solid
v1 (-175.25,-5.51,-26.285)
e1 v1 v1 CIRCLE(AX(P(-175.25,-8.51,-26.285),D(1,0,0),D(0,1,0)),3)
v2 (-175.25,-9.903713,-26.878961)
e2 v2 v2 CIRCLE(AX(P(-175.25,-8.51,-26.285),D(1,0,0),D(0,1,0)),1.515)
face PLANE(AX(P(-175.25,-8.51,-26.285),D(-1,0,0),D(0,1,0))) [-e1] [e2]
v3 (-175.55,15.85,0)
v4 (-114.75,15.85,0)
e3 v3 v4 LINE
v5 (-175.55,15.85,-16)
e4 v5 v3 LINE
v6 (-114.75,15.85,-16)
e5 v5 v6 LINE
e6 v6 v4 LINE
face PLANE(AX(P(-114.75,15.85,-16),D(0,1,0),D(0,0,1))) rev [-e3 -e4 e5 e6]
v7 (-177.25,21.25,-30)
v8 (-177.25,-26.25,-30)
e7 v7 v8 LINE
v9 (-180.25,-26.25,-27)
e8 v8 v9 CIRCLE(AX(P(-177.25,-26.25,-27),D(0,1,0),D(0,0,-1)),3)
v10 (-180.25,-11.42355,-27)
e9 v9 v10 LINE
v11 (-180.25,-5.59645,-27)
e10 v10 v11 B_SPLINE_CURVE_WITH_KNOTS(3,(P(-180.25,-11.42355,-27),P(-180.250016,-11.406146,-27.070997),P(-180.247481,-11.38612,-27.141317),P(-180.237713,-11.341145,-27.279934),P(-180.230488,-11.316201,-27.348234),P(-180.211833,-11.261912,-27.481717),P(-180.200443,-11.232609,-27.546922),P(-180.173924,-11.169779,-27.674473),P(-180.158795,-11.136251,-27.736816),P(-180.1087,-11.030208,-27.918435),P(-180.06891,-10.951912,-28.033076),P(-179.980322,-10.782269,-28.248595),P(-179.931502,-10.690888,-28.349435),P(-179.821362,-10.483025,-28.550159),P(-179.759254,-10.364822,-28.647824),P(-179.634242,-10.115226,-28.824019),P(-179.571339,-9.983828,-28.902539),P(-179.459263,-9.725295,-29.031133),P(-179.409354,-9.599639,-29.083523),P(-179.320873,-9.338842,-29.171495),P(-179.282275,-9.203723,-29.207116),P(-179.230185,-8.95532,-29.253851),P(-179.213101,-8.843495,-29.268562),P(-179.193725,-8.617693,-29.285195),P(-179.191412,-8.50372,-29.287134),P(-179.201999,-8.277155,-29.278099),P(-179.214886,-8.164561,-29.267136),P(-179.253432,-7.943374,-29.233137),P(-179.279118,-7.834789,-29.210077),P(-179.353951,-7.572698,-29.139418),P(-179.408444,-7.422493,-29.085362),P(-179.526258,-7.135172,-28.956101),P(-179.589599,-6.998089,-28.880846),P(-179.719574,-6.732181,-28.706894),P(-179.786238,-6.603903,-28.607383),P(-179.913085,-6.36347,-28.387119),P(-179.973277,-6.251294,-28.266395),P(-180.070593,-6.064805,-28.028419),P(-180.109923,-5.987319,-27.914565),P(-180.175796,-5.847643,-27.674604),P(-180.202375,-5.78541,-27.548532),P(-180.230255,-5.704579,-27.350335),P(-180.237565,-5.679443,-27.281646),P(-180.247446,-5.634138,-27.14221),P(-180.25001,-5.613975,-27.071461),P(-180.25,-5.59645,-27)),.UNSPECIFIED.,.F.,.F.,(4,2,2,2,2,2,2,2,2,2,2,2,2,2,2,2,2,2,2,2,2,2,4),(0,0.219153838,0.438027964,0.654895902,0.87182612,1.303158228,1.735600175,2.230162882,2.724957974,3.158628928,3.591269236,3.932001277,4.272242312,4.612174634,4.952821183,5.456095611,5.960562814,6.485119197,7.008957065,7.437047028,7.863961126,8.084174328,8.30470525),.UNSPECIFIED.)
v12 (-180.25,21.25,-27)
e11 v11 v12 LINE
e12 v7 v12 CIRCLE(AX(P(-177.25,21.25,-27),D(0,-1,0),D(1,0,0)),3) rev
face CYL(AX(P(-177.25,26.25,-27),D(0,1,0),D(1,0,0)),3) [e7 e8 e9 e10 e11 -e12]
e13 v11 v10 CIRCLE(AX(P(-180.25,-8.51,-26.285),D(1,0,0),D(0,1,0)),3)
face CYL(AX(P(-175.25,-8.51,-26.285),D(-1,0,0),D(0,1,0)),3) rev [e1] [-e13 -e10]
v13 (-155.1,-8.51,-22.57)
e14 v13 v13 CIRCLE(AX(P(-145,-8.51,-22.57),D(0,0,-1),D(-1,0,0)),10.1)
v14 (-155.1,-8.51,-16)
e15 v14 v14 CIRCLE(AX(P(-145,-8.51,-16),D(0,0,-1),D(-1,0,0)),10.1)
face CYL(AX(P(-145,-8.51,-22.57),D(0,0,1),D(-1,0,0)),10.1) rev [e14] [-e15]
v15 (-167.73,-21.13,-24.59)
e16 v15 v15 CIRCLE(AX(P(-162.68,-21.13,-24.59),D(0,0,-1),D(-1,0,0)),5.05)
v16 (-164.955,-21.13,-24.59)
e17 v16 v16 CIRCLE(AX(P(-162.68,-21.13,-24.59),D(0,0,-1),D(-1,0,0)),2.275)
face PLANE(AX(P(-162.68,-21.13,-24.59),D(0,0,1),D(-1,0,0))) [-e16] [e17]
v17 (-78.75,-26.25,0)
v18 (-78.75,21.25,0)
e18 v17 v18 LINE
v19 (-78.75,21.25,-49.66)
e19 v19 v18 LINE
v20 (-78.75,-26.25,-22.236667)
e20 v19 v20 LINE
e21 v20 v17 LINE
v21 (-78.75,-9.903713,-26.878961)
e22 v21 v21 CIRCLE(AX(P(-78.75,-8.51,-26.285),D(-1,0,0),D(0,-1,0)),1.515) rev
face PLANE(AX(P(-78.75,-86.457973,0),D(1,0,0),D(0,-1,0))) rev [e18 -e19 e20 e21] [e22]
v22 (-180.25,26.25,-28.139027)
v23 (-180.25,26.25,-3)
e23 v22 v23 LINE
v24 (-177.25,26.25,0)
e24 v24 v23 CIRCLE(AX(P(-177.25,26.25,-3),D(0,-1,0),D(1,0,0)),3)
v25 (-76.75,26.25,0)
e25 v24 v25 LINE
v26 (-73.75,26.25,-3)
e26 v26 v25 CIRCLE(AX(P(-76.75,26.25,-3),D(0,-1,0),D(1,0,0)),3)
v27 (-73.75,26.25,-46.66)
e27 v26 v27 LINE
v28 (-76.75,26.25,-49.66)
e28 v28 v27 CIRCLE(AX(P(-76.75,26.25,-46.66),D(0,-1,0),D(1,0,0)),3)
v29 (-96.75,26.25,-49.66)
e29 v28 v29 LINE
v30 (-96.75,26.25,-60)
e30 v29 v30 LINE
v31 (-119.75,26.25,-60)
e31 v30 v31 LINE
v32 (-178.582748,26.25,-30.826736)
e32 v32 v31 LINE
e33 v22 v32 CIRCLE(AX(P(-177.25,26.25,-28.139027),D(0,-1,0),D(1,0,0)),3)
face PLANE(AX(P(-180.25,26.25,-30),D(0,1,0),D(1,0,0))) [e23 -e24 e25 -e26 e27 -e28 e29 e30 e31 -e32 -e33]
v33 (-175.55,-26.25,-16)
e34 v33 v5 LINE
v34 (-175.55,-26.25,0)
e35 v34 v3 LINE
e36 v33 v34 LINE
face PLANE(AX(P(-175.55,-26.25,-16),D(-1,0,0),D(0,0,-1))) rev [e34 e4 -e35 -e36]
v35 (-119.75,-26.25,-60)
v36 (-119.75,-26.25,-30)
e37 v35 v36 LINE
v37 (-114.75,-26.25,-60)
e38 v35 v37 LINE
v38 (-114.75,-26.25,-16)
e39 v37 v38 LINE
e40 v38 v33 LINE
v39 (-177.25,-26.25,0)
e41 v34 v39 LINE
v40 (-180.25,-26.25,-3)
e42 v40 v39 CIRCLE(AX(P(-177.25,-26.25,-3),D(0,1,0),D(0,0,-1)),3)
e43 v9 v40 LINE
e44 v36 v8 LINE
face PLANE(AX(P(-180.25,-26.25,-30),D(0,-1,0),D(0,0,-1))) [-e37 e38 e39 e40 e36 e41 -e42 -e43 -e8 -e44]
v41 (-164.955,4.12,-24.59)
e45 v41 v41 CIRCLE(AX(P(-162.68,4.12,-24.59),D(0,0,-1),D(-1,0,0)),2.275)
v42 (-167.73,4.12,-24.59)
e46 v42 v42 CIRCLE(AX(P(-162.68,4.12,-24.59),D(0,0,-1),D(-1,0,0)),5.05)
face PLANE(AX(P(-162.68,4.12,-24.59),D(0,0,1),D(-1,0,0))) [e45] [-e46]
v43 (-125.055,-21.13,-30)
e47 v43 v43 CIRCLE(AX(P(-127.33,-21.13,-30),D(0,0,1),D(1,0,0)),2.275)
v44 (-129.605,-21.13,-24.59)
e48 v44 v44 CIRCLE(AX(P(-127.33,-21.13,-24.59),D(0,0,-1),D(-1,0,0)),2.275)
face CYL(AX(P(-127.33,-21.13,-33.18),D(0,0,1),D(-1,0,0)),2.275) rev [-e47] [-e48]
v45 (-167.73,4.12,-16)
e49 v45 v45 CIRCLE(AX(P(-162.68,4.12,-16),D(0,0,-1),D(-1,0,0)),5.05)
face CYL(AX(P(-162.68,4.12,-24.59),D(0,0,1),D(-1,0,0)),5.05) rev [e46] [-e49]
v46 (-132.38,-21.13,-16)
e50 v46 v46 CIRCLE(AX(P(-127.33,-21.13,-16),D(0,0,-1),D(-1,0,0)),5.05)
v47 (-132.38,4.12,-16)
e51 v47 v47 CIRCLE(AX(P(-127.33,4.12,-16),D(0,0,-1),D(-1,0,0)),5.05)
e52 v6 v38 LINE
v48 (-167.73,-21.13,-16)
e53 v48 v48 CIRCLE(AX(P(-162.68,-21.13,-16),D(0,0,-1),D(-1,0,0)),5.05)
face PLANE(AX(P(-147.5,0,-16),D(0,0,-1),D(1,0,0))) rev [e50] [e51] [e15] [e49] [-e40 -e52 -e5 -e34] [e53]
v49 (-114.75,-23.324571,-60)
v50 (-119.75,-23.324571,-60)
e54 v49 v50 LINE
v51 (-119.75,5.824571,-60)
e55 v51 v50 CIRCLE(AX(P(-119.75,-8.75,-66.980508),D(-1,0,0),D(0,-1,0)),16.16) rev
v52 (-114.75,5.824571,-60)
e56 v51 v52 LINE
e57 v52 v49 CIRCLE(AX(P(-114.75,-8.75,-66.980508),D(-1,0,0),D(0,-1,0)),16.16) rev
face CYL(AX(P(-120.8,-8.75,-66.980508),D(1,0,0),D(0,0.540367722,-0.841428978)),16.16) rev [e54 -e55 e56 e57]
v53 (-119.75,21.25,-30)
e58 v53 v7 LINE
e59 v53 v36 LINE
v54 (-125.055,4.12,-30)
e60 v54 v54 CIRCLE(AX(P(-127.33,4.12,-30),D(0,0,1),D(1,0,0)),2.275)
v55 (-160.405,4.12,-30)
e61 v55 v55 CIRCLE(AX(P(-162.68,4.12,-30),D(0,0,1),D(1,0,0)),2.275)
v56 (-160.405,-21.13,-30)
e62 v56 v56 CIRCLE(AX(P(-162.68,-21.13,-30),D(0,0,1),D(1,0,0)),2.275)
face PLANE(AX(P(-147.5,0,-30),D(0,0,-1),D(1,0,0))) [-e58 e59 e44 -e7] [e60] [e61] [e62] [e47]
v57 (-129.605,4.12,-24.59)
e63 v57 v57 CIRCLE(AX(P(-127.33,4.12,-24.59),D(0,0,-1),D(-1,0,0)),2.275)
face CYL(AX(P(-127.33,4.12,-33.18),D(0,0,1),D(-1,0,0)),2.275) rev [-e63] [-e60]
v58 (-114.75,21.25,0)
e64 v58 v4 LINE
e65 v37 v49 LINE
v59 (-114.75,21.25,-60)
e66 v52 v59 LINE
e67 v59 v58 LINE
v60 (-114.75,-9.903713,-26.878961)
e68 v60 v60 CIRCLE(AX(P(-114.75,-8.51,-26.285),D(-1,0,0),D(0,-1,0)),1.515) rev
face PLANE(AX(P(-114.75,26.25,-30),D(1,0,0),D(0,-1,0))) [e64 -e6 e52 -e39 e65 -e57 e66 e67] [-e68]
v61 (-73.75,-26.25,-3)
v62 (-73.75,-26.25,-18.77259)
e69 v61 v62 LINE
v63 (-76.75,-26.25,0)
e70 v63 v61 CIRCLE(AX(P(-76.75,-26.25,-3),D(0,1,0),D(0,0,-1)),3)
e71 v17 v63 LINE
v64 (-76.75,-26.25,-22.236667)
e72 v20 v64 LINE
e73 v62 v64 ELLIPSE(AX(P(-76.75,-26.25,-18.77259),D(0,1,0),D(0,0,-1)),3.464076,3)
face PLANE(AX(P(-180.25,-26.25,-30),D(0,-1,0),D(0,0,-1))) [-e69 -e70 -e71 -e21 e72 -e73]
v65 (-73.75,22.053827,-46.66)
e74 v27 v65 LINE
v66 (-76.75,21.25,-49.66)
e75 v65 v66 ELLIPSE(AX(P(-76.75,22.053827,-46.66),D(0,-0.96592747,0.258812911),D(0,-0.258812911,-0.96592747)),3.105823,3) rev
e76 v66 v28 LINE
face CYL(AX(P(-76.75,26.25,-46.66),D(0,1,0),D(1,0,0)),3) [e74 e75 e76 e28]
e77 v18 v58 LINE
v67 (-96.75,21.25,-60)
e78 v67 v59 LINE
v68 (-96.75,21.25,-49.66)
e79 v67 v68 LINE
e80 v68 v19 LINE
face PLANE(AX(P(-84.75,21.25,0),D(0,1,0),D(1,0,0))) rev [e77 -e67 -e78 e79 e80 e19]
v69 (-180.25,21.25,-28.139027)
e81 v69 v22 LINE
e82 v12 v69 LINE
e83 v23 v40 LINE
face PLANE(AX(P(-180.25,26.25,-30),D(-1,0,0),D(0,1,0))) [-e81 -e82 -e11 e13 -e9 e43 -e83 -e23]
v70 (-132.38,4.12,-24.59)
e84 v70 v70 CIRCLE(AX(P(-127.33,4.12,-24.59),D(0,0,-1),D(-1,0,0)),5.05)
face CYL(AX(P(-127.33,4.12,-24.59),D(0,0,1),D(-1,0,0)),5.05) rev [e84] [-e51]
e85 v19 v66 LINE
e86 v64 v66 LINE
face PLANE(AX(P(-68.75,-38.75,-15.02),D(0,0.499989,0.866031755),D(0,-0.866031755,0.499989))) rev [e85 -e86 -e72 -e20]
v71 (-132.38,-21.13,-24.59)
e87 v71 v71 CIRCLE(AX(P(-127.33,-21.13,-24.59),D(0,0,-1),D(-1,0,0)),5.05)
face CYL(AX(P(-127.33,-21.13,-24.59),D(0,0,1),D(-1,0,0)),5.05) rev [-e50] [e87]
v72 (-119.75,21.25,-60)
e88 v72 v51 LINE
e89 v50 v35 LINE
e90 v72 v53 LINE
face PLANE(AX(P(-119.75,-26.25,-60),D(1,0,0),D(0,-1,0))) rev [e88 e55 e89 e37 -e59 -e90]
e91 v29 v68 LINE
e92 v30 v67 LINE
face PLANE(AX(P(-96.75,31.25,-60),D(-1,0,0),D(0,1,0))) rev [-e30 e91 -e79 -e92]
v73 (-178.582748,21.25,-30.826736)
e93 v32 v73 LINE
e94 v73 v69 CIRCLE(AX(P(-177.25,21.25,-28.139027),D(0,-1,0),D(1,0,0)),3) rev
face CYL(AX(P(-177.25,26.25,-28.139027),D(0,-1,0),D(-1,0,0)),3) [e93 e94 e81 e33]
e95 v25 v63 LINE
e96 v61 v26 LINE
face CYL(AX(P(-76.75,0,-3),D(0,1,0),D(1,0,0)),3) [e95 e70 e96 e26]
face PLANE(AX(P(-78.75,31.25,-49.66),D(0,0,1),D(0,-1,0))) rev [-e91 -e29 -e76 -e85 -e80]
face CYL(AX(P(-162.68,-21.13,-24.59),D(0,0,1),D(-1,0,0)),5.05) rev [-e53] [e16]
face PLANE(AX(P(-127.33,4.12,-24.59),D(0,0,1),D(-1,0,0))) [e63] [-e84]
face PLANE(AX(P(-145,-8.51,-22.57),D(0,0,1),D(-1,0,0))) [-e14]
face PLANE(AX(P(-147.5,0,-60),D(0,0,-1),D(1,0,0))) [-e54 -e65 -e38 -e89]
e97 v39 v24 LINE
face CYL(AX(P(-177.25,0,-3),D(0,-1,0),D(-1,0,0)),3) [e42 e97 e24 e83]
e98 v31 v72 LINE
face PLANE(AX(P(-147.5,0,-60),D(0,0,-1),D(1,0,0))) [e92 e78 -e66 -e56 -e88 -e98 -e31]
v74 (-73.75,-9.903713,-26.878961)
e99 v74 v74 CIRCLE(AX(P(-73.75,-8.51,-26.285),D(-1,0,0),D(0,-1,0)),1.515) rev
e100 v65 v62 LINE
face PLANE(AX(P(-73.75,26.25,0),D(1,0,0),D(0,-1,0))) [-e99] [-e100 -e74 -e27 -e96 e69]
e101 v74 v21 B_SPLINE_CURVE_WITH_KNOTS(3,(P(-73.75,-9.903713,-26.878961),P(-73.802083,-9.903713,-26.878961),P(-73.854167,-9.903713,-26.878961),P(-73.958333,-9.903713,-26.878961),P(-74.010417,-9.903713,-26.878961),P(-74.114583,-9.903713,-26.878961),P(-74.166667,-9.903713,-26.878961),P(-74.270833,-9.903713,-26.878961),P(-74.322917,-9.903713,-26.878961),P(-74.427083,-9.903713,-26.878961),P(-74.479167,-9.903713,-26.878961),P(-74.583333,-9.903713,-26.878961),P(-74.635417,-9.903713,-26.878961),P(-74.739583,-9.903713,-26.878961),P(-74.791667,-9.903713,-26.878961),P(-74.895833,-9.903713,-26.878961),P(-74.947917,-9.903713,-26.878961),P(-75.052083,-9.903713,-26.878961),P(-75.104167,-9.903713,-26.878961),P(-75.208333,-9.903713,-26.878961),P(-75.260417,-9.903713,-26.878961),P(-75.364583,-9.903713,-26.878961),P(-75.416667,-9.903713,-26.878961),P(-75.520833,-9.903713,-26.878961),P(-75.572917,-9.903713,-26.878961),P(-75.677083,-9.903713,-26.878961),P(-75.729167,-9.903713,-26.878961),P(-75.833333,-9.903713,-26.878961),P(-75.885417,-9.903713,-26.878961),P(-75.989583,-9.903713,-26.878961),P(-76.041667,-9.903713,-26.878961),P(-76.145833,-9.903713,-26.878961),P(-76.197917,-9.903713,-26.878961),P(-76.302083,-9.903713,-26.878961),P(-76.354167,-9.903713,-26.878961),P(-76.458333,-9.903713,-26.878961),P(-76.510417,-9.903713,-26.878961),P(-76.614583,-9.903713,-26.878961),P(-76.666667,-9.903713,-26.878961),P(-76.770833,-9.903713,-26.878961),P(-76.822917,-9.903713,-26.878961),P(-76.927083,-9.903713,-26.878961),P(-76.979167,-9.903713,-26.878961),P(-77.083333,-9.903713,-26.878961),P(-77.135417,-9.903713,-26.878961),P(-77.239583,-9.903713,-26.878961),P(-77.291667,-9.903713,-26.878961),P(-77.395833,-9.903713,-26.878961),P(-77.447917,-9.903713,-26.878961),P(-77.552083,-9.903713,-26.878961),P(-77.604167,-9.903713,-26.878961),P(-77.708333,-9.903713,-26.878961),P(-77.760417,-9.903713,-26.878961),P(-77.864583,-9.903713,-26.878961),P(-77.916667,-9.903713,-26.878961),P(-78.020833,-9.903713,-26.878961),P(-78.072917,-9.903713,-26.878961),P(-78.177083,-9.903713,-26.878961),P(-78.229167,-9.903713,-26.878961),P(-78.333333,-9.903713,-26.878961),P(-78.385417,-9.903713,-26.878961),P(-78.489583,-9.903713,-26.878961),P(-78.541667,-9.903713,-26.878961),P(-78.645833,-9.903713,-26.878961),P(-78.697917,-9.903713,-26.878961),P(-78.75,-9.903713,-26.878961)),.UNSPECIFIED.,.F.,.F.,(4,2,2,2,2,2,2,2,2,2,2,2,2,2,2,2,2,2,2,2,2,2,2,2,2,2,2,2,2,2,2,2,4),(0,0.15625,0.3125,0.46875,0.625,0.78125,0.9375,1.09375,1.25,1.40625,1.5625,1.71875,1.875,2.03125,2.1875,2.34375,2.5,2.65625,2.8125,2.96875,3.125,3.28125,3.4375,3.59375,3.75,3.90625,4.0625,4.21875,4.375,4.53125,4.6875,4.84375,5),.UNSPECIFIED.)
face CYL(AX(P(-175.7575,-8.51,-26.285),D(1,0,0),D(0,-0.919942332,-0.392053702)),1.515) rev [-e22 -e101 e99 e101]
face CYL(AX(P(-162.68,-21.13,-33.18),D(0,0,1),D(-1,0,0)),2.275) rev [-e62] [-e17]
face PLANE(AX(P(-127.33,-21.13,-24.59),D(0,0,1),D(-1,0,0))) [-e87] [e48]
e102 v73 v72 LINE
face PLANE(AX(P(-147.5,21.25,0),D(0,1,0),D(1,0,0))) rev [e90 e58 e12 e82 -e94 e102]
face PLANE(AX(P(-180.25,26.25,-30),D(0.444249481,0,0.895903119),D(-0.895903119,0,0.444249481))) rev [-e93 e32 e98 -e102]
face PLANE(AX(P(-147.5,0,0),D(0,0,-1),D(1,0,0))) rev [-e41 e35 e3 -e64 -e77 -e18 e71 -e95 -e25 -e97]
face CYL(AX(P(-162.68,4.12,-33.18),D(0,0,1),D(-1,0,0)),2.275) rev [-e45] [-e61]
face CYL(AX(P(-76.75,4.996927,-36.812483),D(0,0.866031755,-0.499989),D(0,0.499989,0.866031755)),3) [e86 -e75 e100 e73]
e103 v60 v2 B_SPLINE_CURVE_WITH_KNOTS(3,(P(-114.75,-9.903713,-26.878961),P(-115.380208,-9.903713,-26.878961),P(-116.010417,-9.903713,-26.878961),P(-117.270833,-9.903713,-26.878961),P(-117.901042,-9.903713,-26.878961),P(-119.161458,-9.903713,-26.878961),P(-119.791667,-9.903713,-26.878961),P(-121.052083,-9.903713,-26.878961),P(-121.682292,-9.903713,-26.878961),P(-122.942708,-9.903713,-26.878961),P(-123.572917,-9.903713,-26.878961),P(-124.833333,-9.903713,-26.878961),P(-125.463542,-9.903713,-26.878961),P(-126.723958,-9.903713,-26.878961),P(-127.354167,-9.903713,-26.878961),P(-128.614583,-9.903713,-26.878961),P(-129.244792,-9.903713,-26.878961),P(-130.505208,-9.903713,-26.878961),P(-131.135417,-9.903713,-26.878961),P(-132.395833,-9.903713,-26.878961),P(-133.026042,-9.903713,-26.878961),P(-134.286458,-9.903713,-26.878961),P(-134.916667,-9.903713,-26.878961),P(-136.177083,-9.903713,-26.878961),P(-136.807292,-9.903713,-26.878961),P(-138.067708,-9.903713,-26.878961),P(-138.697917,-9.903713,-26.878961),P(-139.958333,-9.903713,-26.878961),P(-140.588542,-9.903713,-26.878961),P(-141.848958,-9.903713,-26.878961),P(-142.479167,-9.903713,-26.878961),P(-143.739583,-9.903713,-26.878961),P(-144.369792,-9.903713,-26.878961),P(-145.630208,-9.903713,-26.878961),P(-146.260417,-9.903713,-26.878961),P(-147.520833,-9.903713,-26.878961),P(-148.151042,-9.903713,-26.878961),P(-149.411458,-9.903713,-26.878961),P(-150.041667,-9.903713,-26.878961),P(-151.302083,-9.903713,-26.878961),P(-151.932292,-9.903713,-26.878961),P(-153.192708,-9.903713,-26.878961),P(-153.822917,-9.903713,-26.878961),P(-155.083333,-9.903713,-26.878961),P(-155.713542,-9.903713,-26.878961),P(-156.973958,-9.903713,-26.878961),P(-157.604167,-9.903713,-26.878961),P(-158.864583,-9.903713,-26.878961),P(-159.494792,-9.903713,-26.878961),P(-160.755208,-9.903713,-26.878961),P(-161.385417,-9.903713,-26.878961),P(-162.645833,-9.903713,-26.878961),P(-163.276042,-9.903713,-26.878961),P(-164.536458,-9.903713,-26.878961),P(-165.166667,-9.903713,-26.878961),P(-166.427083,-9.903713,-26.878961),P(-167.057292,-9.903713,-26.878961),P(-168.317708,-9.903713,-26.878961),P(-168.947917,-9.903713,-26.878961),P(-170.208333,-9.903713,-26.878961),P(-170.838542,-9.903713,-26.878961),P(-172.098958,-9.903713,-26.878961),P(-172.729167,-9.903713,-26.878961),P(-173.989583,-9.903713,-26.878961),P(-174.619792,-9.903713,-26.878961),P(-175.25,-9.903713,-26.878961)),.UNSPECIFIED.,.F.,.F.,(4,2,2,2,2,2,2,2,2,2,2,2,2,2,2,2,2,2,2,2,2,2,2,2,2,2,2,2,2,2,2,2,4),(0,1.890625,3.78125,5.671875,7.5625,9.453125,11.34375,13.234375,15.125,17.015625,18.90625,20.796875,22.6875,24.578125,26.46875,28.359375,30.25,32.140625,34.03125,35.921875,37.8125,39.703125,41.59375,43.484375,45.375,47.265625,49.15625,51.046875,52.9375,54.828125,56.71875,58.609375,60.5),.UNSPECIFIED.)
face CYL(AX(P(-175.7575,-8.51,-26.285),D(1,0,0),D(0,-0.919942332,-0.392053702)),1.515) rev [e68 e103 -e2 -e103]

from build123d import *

# Parameters (mm, degrees)
CROQUIS1_W              = 65.5
CROQUIS1_H              = 52.5
SALIENTE_EXTRUIR1_DEPTH = 30
CROQUIS2_W              = 60.8
CROQUIS2_H              = 42.1
CORTAR_EXTRUIR1_DEPTH   = 16
CROQUIS3_W              = 5
CROQUIS3_H              = 52.5
SALIENTE_EXTRUIR2_DEPTH = 30
CROQUIS4_W              = 60
CROQUIS4_H              = 5
SALIENTE_EXTRUIR3_DEPTH = 30
CROQUIS5_R              = 10.1
CORTAR_EXTRUIR2_DEPTH   = 6.57
CROQUIS7_R              = 5.05
CORTAR_EXTRUIR3_DEPTH   = 8.59
CROQUIS8_R              = 2.275
CORTAR_EXTRUIR4_DEPTH   = 8.59
CROQUIS9_W              = 60.5
CROQUIS9_H              = 30
SALIENTE_EXTRUIR4_DEPTH = 5
CORTAR_EXTRUIR5_DEPTH   = 5
CROQUIS11_W             = 41
CROQUIS11_H             = 60
SALIENTE_EXTRUIR5_DEPTH = 5
CROQUIS12_W             = 5
CROQUIS12_H             = 60
SALIENTE_EXTRUIR6_DEPTH = 47.5
CROQUIS13_W             = 18
CROQUIS13_H             = 10.34
CORTAR_EXTRUIR6_DEPTH   = 10
CROQUIS14_W             = 17.194416488
CROQUIS14_H             = 64.089157204
CORTAR_EXTRUIR7_DEPTH   = 10
CORTAR_EXTRUIR8_DEPTH   = 10
REDONDEO1_R             = 3
REDONDEO6_R             = 3
REDONDEO7_R             = 3
CAVIDAD1_START          = -32.75
CAVIDAD1_DEPTH          = 5
CROQUIS16_R             = 1.5
CORTAR_EXTRUIR10_DEPTH  = 10
CAVIDAD3_START          = -73.75
CAVIDAD3_OUTLINE_R      = 1.515
CAVIDAD3_DEPTH          = 106.5
CROQUIS17_R             = 3
CORTAR_EXTRUIR11_DEPTH  = 5
REDONDEO8_R             = 3
REDONDEO9_R             = 3


# Read off the part's stored shape, not the designer's step: Cavidad1, Cavidad3
with BuildPart() as part:
    # Croquis1 → Saliente-Extruir1 (new body)
    with BuildSketch(Plane.XY):
        Rectangle(CROQUIS1_W, CROQUIS1_H)
    extrude(amount=-SALIENTE_EXTRUIR1_DEPTH)

    # Croquis2 → Cortar-Extruir1 (cut)
    with BuildSketch(Plane.XY):
        with Locations((-2.35, -5.2)):
            Rectangle(CROQUIS2_W, CROQUIS2_H)
    extrude(amount=-CORTAR_EXTRUIR1_DEPTH, mode=Mode.SUBTRACT)

    # Croquis3 → Saliente-Extruir2 (add)
    with BuildSketch(Plane(origin=(0, 0, -30), x_dir=(-1, 0, 0), z_dir=(0, 0, -1))):
        with Locations((30.25, 0)):
            Rectangle(CROQUIS3_W, CROQUIS3_H)
    extrude(amount=SALIENTE_EXTRUIR2_DEPTH)

    # Croquis4 → Saliente-Extruir3 (add)
    with BuildSketch(Plane.ZY.offset(32.75)):
        with Locations((-30, 23.75)):
            Rectangle(CROQUIS4_W, CROQUIS4_H)
    extrude(amount=SALIENTE_EXTRUIR3_DEPTH)

    # Croquis5 → Cortar-Extruir2 (cut)
    with BuildSketch(Plane.XY.offset(-16)):
        with Locations((-2.5, -8.51)):
            Circle(CROQUIS5_R)
    extrude(amount=-CORTAR_EXTRUIR2_DEPTH, mode=Mode.SUBTRACT)

    # Croquis7 → Cortar-Extruir3 (cut)
    with BuildSketch(Plane.XY.offset(-16)):
        with Locations((-20.17, 4.12)):
            Circle(CROQUIS7_R)
        with Locations((15.18, 4.12)):
            Circle(CROQUIS7_R)
        with Locations((15.18, -21.13)):
            Circle(CROQUIS7_R)
        with Locations((-20.17, -21.13)):
            Circle(CROQUIS7_R)
    extrude(amount=-CORTAR_EXTRUIR3_DEPTH, mode=Mode.SUBTRACT)

    # Croquis8 → Cortar-Extruir4 (cut)
    with BuildSketch(Plane.XY.offset(-24.59)):
        with Locations((-20.17, 4.12)):
            Circle(CROQUIS8_R)
        with Locations((-20.17, -21.13)):
            Circle(CROQUIS8_R)
        with Locations((15.18, 4.12)):
            Circle(CROQUIS8_R)
        with Locations((15.18, -21.13)):
            Circle(CROQUIS8_R)
    extrude(amount=-CORTAR_EXTRUIR4_DEPTH, mode=Mode.SUBTRACT)

    # Croquis9 → Saliente-Extruir4 (add)
    with BuildSketch(Plane(origin=(0, 26.25, 0), x_dir=(1, 0, 0), z_dir=(0, 1, 0))):
        with Locations((2.5, 45)):
            Rectangle(CROQUIS9_W, CROQUIS9_H)
    extrude(amount=-SALIENTE_EXTRUIR4_DEPTH)

    # Croquis10 → Cortar-Extruir5 (cut)
    with BuildSketch(Plane.XZ.offset(-21.25)):
        Polygon((32.75, -30), (-27.75, -60), (-30.096630242, -66.962952029), (62.11742193, -82.705107475), (54.436655983, -30), align=None)
    extrude(amount=-CORTAR_EXTRUIR5_DEPTH, mode=Mode.SUBTRACT)

    # Croquis11 → Saliente-Extruir5 (add)
    with BuildSketch(Plane.XZ.offset(-21.25)):
        with Locations((-53.25, -30)):
            Rectangle(CROQUIS11_W, CROQUIS11_H)
    extrude(amount=-SALIENTE_EXTRUIR5_DEPTH)

    # Croquis12 → Saliente-Extruir6 (add)
    with BuildSketch(Plane.XZ.offset(-21.25)):
        with Locations((-71.25, -30)):
            Rectangle(CROQUIS12_W, CROQUIS12_H)
    extrude(amount=SALIENTE_EXTRUIR6_DEPTH)

    # Croquis13 → Cortar-Extruir6 (cut)
    with BuildSketch(Plane.XZ.offset(-21.25)):
        with Locations((-59.75, -54.83)):
            Rectangle(CROQUIS13_W, CROQUIS13_H)
    extrude(amount=-CORTAR_EXTRUIR6_DEPTH, mode=Mode.SUBTRACT)

    # Croquis14 → Cortar-Extruir7 (cut)
    with BuildSketch(Plane(origin=(-68.75, 0, 0), x_dir=(0, 0, -1), z_dir=(1, 0, 0))):
        with Locations((58.257208244, -5.794578602)):
            Rectangle(CROQUIS14_W, CROQUIS14_H)
    extrude(amount=-CORTAR_EXTRUIR7_DEPTH, mode=Mode.SUBTRACT)

    # Croquis15 → Cortar-Extruir8 (cut)
    with BuildSketch(Plane(origin=(-68.75, 0, 0), x_dir=(0, 0, -1), z_dir=(1, 0, 0))):
        Polygon((15.02, -38.75), (49.66, 21.25), (49.66, -38.75), align=None)
    extrude(amount=-CORTAR_EXTRUIR8_DEPTH, mode=Mode.SUBTRACT)

    # Redondeo1
    redondeo1_edges = [part.edges().sort_by_distance(p)[0] for p in [
        (32.75, 0, 0),
    ]]
    fillet(redondeo1_edges, radius=REDONDEO1_R)

    # Redondeo6
    redondeo6_edges = [part.edges().sort_by_distance(p)[0] for p in [
        (32.75, -2.5, -30),
    ]]
    fillet(redondeo6_edges, radius=REDONDEO6_R)

    # Redondeo7
    redondeo7_edges = [part.edges().sort_by_distance(p)[0] for p in [
        (32.75, 23.75, -30),
    ]]
    fillet(redondeo7_edges, radius=REDONDEO7_R)

    # Cavidad1 outline → Cavidad1 (cut)
    with BuildSketch(Plane.YZ.offset(CAVIDAD1_START)):
        with BuildLine():
            ThreePointArc((5.82457056, -60), (-8.75, -50.820508076), (-23.32457056, -60))
            Line((-23.32457056, -60), (5.82457056, -60))
        make_face()
    extrude(amount=CAVIDAD1_DEPTH, mode=Mode.SUBTRACT)

    # Croquis16 → Cortar-Extruir10 (cut)
    with BuildSketch(Plane.ZY.offset(-28.05)):
        with Locations((-26.285, -8.51)):
            Circle(CROQUIS16_R)
    extrude(amount=-CORTAR_EXTRUIR10_DEPTH, mode=Mode.SUBTRACT)

    # Cavidad3 outline → Cavidad3 (cut)
    with BuildSketch(Plane.YZ.offset(CAVIDAD3_START)):
        with Locations((-8.51, -26.285)):
            Circle(CAVIDAD3_OUTLINE_R)
    extrude(amount=CAVIDAD3_DEPTH, mode=Mode.SUBTRACT)

    # Croquis17 → Cortar-Extruir11 (cut)
    with BuildSketch(Plane(origin=(32.75, 0, 0), x_dir=(0, 0, -1), z_dir=(1, 0, 0))):
        with Locations(Location((26.285, -8.51, 0), (0, 0, 90))):
            Circle(CROQUIS17_R)
    extrude(amount=-CORTAR_EXTRUIR11_DEPTH, mode=Mode.SUBTRACT)

    # Redondeo8
    redondeo8_edges = [part.edges().sort_by_distance(p)[0] for p in [
        (-73.75, 0, 0),
    ]]
    fillet(redondeo8_edges, radius=REDONDEO8_R)

    # Redondeo9
    redondeo9_edges = [part.edges().sort_by_distance(p)[0] for p in [
        (-73.75, 23.75, -49.66),
        (-73.75, -2.5, -35.948333333),
    ]]
    fillet(redondeo9_edges, radius=REDONDEO9_R)


with BuildPart() as body_2:
    # Simetría1: mirrored copy
    add(part.part.mirror(Plane(origin=(-73.75, 26.25, 0), x_dir=(0, 0, 1), z_dir=(-1, 0, 0))))


solid = body_2.part
